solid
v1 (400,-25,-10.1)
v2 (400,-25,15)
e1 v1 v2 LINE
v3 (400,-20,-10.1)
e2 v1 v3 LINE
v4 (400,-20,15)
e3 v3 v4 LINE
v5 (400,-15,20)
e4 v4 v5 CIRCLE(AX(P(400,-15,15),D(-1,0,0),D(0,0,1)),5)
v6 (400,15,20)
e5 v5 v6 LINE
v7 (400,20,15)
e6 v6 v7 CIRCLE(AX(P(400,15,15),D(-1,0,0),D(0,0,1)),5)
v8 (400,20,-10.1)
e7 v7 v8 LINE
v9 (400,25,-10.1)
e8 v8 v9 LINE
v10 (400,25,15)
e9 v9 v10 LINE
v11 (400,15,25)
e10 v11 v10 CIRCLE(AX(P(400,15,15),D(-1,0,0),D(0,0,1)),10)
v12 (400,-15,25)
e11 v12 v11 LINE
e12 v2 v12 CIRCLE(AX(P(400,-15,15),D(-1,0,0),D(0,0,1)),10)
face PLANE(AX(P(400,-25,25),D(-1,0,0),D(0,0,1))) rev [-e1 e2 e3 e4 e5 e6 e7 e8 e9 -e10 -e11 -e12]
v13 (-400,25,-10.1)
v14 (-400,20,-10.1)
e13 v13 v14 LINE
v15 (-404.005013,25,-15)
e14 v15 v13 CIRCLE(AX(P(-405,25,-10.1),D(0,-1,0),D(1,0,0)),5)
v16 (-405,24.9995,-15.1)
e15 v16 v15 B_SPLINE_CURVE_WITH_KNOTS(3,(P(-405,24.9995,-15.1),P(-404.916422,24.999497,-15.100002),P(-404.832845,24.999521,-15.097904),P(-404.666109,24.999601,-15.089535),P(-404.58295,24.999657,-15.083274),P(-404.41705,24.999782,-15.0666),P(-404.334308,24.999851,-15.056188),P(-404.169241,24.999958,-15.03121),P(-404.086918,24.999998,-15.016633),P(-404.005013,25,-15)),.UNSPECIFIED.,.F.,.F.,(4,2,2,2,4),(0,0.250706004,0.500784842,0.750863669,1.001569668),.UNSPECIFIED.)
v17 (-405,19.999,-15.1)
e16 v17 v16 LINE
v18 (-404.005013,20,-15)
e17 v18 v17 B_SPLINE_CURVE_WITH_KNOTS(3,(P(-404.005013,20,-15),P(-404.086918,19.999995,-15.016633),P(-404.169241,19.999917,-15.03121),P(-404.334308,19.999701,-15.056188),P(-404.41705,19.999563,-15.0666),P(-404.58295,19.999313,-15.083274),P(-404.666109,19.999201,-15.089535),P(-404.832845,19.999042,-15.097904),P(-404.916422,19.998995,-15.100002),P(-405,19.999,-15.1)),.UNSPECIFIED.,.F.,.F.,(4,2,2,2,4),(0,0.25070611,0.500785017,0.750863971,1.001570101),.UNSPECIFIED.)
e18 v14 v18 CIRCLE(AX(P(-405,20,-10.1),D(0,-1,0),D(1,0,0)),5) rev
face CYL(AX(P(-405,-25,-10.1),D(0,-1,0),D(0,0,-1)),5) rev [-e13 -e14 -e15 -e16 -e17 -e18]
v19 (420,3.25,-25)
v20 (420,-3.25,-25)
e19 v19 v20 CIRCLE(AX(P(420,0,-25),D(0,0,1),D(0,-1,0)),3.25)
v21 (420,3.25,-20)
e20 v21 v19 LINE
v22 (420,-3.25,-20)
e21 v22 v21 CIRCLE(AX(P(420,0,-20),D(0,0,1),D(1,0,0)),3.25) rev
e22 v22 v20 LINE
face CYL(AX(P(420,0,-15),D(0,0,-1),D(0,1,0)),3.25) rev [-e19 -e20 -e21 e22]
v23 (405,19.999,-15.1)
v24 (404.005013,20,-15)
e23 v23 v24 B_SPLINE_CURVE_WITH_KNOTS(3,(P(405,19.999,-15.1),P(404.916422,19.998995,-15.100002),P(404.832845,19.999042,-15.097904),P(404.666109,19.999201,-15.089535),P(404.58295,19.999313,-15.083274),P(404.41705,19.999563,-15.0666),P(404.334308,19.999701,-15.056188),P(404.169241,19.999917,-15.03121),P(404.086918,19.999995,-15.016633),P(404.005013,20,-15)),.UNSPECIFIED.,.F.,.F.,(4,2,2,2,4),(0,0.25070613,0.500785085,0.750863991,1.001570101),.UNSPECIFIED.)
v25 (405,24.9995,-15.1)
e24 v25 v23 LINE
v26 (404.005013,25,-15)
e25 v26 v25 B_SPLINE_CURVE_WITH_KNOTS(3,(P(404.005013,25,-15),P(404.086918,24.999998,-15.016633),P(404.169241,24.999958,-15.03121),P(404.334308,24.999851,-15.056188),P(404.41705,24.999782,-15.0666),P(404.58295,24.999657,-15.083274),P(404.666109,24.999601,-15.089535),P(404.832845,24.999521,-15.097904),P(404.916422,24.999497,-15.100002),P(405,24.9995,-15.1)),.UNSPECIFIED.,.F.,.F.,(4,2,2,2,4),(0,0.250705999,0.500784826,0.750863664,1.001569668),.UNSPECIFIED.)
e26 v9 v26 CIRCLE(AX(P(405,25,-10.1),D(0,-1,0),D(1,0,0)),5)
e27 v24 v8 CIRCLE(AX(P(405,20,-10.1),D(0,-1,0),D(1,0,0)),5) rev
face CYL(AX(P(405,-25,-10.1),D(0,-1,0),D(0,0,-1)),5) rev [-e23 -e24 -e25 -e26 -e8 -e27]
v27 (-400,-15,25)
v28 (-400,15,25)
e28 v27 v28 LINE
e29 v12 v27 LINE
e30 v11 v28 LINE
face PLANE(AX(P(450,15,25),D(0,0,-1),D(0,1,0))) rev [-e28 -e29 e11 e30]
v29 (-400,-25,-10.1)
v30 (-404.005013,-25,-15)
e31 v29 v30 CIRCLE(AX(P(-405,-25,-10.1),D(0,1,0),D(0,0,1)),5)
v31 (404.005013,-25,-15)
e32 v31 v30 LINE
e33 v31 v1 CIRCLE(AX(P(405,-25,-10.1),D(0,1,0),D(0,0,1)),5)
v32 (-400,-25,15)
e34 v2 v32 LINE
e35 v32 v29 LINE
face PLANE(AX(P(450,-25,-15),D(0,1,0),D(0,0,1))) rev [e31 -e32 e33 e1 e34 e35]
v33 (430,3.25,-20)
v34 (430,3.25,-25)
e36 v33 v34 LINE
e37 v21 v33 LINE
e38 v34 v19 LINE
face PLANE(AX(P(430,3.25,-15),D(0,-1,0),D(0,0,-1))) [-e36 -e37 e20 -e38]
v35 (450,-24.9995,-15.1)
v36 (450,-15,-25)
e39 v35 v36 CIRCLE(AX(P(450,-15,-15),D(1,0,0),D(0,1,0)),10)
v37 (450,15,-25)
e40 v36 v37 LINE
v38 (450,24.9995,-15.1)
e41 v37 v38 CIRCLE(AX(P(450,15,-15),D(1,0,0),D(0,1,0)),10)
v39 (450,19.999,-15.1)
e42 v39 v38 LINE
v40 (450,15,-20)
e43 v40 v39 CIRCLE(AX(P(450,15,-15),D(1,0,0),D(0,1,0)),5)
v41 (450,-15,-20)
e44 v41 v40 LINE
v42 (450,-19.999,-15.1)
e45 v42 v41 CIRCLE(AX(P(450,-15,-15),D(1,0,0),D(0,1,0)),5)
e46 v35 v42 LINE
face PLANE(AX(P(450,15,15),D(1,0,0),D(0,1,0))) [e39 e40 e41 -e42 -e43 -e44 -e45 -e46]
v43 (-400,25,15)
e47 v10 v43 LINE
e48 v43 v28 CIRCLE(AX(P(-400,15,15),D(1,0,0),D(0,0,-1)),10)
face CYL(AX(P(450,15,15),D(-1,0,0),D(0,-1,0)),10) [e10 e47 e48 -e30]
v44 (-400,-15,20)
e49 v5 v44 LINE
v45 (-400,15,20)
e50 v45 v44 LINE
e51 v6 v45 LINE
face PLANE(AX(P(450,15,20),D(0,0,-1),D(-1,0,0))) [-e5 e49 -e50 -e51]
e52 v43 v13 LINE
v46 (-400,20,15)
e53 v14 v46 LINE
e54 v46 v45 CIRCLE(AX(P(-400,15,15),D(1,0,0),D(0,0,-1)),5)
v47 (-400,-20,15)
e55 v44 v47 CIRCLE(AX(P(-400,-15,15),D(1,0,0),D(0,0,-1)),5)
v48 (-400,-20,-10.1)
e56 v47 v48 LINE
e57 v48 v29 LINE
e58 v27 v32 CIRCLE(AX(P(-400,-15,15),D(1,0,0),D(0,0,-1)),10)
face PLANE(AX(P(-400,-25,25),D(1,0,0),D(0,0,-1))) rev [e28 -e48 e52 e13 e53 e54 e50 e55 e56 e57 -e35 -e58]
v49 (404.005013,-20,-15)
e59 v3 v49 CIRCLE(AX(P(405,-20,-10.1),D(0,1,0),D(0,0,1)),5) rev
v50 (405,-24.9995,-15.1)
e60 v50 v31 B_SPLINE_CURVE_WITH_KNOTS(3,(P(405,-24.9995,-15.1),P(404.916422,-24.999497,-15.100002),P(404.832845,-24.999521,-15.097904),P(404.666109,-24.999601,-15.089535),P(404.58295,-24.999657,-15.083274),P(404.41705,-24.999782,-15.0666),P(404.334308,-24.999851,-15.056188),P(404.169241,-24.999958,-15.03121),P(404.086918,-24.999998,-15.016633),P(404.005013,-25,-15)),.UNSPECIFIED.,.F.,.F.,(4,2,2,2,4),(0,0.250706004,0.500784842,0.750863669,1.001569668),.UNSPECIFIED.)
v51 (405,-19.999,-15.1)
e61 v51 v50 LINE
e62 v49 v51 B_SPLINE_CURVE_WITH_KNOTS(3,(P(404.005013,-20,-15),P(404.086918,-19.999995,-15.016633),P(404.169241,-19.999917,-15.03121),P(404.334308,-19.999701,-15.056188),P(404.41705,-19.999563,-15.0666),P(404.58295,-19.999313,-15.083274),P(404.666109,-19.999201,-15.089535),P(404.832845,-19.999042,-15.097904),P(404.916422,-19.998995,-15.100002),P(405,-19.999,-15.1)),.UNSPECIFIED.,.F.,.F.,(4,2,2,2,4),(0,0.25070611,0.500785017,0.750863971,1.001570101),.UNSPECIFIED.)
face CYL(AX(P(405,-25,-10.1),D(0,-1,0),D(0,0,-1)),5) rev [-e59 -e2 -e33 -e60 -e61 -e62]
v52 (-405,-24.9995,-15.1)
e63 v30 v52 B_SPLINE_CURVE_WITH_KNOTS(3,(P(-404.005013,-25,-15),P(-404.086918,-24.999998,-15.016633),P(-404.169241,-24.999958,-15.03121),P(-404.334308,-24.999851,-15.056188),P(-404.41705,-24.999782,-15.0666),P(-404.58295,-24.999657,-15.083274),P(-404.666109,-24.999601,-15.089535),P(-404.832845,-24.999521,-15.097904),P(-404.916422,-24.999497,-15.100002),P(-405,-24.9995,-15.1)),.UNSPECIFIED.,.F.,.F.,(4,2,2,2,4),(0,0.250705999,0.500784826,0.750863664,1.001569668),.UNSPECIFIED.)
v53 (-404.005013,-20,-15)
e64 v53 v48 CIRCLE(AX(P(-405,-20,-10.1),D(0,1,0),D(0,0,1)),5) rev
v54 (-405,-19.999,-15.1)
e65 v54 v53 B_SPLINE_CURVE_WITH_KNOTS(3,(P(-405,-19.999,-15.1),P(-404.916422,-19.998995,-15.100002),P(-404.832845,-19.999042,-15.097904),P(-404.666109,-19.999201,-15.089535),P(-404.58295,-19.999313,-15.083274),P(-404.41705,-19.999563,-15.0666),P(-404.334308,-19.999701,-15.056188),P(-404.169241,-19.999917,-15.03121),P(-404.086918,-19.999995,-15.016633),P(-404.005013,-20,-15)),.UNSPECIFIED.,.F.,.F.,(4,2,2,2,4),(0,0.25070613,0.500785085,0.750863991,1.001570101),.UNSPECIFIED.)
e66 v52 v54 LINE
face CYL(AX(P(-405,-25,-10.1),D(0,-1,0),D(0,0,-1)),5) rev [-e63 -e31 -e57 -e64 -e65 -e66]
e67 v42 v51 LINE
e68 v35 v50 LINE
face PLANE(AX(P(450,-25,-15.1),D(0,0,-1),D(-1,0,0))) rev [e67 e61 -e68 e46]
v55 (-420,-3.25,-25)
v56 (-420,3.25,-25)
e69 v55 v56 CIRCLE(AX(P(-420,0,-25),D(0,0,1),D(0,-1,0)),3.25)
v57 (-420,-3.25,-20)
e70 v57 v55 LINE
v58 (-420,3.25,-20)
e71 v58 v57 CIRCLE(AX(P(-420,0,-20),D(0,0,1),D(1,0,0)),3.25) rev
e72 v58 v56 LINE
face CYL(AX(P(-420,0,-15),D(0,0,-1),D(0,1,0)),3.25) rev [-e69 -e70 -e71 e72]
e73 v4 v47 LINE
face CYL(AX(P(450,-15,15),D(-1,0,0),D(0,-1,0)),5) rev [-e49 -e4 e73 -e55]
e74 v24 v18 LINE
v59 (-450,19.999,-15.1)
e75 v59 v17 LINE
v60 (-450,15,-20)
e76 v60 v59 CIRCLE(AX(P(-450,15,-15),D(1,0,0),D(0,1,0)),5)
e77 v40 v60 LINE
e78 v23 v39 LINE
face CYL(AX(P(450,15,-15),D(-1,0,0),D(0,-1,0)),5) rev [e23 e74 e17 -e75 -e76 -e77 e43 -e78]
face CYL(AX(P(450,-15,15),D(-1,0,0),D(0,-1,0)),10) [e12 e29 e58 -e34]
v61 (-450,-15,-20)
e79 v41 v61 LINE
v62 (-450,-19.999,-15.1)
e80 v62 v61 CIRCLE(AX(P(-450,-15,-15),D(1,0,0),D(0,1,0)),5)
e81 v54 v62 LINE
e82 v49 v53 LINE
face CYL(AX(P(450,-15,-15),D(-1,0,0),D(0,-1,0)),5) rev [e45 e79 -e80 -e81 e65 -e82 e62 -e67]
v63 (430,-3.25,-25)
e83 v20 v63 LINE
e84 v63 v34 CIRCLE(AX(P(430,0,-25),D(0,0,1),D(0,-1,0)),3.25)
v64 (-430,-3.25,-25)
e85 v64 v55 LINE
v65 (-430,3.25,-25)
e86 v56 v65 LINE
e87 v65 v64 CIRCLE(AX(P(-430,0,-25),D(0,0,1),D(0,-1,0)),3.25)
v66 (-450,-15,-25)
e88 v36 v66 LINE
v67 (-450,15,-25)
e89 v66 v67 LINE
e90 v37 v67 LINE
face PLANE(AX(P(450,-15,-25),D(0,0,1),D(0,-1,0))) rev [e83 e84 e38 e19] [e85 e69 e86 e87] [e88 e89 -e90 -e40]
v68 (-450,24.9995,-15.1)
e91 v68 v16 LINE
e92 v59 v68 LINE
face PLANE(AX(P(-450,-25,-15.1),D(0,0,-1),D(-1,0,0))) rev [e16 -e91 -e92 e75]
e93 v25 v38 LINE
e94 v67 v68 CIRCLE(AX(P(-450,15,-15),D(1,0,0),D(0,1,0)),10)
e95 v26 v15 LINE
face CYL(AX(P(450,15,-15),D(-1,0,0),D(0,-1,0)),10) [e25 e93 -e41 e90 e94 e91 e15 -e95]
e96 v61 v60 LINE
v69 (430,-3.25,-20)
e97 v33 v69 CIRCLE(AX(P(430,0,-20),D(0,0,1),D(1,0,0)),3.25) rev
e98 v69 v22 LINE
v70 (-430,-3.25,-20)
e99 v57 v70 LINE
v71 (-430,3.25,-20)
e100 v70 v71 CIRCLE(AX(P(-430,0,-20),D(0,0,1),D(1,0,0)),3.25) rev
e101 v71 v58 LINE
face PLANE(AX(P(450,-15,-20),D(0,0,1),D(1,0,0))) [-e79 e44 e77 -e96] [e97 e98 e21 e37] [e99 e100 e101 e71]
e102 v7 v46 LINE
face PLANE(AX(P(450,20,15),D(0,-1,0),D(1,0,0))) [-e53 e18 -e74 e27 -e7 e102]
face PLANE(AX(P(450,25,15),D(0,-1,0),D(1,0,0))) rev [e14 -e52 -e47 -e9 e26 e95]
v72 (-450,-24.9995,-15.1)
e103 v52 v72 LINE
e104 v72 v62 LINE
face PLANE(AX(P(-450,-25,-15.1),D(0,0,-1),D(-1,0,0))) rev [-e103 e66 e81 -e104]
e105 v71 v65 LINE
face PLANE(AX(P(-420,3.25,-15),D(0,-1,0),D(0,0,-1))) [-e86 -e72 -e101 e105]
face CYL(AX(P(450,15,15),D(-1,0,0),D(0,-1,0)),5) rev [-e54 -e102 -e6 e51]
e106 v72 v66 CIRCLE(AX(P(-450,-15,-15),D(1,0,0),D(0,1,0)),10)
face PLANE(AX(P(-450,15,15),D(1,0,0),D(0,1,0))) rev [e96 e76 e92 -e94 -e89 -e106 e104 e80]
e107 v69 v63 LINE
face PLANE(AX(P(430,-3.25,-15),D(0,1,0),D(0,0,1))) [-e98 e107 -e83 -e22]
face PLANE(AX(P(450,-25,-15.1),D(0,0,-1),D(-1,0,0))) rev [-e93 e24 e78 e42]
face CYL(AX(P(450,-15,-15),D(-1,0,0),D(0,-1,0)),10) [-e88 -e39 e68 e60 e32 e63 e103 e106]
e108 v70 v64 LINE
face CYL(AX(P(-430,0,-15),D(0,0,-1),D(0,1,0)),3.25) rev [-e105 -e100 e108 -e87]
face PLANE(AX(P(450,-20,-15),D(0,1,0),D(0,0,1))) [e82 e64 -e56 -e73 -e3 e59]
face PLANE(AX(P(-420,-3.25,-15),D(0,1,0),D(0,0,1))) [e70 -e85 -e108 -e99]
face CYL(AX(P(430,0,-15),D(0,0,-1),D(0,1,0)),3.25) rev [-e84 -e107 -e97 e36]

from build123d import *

# Parameters (mm, degrees)
SHS_RHS50X50X5_1_DEPTH  = 900
CUT_EXTRUDE1_DEPTH      = 452.386752132
CUT_EXTRUDE1_DEPTH_BACK = 452.386752132
SKETCH20_W              = 50
SKETCH20_H              = 40.1
FILLET1_START           = -25
FILLET1_DEPTH           = 5
FILLET1_START_2         = 20
FILLET1_2_DEPTH         = 5
CUT_EXTRUDE2_DEPTH      = 10


with BuildPart() as part:
    # Sketch116 → Shs RHS50X50X5(1) (new body)
    with BuildSketch(Plane.YZ.offset(-450)):
        with BuildLine():
            Line((-15, -25), (15, -25))
            ThreePointArc((15, -25), (22.071067812, -22.071067812), (25, -15))
            Line((25, -15), (25, 15))
            ThreePointArc((25, 15), (22.071067812, 22.071067812), (15, 25))
            Line((15, 25), (-15, 25))
            ThreePointArc((-15, 25), (-22.071067812, 22.071067812), (-25, 15))
            Line((-25, 15), (-25, -15))
            ThreePointArc((-25, -15), (-22.071067812, -22.071067812), (-15, -25))
        make_face()
        with BuildLine():
            Line((-15, -20), (15, -20))
            ThreePointArc((15, -20), (18.535533906, -18.535533906), (20, -15))
            Line((20, -15), (20, 15))
            ThreePointArc((20, 15), (18.535533906, 18.535533906), (15, 20))
            Line((15, 20), (-15, 20))
            ThreePointArc((-15, 20), (-18.535533906, 18.535533906), (-20, 15))
            Line((-20, 15), (-20, -15))
            ThreePointArc((-20, -15), (-18.535533906, -18.535533906), (-15, -20))
        make_face(mode=Mode.SUBTRACT)
    extrude(amount=SHS_RHS50X50X5_1_DEPTH)

    # Sketch20 → Cut-Extrude1 (cut, two sides: drawn at the far end of the back side and taken through both)
    with BuildSketch(Plane(origin=(0, 0, 0), x_dir=(1, 0, 0), z_dir=(0, 1, 0)).offset(-CUT_EXTRUDE1_DEPTH_BACK)):
        with Locations((425, -4.95)):
            Rectangle(SKETCH20_W, SKETCH20_H)
        with Locations((-425, -4.95)):
            Rectangle(SKETCH20_W, SKETCH20_H)
    extrude(amount=CUT_EXTRUDE1_DEPTH + CUT_EXTRUDE1_DEPTH_BACK, mode=Mode.SUBTRACT)

    # Fillet1: read off the stored shape, not the designer's step
    # Fillet1 outline → Fillet1 (add)
    with BuildSketch(Plane(origin=(0, 0, 0), x_dir=(1, 0, 0), z_dir=(0, 1, 0)).offset(FILLET1_START)):
        with BuildLine():
            Line((400, 15.1), (400, 10.1))
            ThreePointArc((400, 10.1), (401.464466094, 13.635533906), (405, 15.1))
            Line((405, 15.1), (400, 15.1))
        make_face()
        with BuildLine():
            Line((-400, 15.1), (-405, 15.1))
            ThreePointArc((-405, 15.1), (-401.464466094, 13.635533906), (-400, 10.1))
            Line((-400, 10.1), (-400, 15.1))
        make_face()
    extrude(amount=FILLET1_DEPTH)

    # Fillet1 2 outline → Fillet1 2 (add)
    with BuildSketch(Plane(origin=(0, 0, 0), x_dir=(1, 0, 0), z_dir=(0, 1, 0)).offset(FILLET1_START_2)):
        with BuildLine():
            Line((400, 15.1), (400, 10.1))
            ThreePointArc((400, 10.1), (401.464466094, 13.635533906), (405, 15.1))
            Line((405, 15.1), (400, 15.1))
        make_face()
        with BuildLine():
            Line((-400, 15.1), (-405, 15.1))
            ThreePointArc((-405, 15.1), (-401.464466094, 13.635533906), (-400, 10.1))
            Line((-400, 10.1), (-400, 15.1))
        make_face()
    extrude(amount=FILLET1_2_DEPTH)

    # Sketch21 → Cut-Extrude2 (cut)
    with BuildSketch(Plane(origin=(0, 0, -25), x_dir=(-1, 0, 0), z_dir=(0, 0, 1))):
        with BuildLine():
            Line((420, 3.25), (430, 3.25))
            ThreePointArc((430, 3.25), (433.25, 0), (430, -3.25))
            Line((430, -3.25), (420, -3.25))
            ThreePointArc((420, -3.25), (416.75, 0), (420, 3.25))
        make_face()
        with BuildLine():
            Line((-430, 3.25), (-420, 3.25))
            ThreePointArc((-420, 3.25), (-416.75, 0), (-420, -3.25))
            Line((-420, -3.25), (-430, -3.25))
            ThreePointArc((-430, -3.25), (-433.25, 0), (-430, 3.25))
        make_face()
    extrude(amount=CUT_EXTRUDE2_DEPTH, mode=Mode.SUBTRACT)


solid = part.part
